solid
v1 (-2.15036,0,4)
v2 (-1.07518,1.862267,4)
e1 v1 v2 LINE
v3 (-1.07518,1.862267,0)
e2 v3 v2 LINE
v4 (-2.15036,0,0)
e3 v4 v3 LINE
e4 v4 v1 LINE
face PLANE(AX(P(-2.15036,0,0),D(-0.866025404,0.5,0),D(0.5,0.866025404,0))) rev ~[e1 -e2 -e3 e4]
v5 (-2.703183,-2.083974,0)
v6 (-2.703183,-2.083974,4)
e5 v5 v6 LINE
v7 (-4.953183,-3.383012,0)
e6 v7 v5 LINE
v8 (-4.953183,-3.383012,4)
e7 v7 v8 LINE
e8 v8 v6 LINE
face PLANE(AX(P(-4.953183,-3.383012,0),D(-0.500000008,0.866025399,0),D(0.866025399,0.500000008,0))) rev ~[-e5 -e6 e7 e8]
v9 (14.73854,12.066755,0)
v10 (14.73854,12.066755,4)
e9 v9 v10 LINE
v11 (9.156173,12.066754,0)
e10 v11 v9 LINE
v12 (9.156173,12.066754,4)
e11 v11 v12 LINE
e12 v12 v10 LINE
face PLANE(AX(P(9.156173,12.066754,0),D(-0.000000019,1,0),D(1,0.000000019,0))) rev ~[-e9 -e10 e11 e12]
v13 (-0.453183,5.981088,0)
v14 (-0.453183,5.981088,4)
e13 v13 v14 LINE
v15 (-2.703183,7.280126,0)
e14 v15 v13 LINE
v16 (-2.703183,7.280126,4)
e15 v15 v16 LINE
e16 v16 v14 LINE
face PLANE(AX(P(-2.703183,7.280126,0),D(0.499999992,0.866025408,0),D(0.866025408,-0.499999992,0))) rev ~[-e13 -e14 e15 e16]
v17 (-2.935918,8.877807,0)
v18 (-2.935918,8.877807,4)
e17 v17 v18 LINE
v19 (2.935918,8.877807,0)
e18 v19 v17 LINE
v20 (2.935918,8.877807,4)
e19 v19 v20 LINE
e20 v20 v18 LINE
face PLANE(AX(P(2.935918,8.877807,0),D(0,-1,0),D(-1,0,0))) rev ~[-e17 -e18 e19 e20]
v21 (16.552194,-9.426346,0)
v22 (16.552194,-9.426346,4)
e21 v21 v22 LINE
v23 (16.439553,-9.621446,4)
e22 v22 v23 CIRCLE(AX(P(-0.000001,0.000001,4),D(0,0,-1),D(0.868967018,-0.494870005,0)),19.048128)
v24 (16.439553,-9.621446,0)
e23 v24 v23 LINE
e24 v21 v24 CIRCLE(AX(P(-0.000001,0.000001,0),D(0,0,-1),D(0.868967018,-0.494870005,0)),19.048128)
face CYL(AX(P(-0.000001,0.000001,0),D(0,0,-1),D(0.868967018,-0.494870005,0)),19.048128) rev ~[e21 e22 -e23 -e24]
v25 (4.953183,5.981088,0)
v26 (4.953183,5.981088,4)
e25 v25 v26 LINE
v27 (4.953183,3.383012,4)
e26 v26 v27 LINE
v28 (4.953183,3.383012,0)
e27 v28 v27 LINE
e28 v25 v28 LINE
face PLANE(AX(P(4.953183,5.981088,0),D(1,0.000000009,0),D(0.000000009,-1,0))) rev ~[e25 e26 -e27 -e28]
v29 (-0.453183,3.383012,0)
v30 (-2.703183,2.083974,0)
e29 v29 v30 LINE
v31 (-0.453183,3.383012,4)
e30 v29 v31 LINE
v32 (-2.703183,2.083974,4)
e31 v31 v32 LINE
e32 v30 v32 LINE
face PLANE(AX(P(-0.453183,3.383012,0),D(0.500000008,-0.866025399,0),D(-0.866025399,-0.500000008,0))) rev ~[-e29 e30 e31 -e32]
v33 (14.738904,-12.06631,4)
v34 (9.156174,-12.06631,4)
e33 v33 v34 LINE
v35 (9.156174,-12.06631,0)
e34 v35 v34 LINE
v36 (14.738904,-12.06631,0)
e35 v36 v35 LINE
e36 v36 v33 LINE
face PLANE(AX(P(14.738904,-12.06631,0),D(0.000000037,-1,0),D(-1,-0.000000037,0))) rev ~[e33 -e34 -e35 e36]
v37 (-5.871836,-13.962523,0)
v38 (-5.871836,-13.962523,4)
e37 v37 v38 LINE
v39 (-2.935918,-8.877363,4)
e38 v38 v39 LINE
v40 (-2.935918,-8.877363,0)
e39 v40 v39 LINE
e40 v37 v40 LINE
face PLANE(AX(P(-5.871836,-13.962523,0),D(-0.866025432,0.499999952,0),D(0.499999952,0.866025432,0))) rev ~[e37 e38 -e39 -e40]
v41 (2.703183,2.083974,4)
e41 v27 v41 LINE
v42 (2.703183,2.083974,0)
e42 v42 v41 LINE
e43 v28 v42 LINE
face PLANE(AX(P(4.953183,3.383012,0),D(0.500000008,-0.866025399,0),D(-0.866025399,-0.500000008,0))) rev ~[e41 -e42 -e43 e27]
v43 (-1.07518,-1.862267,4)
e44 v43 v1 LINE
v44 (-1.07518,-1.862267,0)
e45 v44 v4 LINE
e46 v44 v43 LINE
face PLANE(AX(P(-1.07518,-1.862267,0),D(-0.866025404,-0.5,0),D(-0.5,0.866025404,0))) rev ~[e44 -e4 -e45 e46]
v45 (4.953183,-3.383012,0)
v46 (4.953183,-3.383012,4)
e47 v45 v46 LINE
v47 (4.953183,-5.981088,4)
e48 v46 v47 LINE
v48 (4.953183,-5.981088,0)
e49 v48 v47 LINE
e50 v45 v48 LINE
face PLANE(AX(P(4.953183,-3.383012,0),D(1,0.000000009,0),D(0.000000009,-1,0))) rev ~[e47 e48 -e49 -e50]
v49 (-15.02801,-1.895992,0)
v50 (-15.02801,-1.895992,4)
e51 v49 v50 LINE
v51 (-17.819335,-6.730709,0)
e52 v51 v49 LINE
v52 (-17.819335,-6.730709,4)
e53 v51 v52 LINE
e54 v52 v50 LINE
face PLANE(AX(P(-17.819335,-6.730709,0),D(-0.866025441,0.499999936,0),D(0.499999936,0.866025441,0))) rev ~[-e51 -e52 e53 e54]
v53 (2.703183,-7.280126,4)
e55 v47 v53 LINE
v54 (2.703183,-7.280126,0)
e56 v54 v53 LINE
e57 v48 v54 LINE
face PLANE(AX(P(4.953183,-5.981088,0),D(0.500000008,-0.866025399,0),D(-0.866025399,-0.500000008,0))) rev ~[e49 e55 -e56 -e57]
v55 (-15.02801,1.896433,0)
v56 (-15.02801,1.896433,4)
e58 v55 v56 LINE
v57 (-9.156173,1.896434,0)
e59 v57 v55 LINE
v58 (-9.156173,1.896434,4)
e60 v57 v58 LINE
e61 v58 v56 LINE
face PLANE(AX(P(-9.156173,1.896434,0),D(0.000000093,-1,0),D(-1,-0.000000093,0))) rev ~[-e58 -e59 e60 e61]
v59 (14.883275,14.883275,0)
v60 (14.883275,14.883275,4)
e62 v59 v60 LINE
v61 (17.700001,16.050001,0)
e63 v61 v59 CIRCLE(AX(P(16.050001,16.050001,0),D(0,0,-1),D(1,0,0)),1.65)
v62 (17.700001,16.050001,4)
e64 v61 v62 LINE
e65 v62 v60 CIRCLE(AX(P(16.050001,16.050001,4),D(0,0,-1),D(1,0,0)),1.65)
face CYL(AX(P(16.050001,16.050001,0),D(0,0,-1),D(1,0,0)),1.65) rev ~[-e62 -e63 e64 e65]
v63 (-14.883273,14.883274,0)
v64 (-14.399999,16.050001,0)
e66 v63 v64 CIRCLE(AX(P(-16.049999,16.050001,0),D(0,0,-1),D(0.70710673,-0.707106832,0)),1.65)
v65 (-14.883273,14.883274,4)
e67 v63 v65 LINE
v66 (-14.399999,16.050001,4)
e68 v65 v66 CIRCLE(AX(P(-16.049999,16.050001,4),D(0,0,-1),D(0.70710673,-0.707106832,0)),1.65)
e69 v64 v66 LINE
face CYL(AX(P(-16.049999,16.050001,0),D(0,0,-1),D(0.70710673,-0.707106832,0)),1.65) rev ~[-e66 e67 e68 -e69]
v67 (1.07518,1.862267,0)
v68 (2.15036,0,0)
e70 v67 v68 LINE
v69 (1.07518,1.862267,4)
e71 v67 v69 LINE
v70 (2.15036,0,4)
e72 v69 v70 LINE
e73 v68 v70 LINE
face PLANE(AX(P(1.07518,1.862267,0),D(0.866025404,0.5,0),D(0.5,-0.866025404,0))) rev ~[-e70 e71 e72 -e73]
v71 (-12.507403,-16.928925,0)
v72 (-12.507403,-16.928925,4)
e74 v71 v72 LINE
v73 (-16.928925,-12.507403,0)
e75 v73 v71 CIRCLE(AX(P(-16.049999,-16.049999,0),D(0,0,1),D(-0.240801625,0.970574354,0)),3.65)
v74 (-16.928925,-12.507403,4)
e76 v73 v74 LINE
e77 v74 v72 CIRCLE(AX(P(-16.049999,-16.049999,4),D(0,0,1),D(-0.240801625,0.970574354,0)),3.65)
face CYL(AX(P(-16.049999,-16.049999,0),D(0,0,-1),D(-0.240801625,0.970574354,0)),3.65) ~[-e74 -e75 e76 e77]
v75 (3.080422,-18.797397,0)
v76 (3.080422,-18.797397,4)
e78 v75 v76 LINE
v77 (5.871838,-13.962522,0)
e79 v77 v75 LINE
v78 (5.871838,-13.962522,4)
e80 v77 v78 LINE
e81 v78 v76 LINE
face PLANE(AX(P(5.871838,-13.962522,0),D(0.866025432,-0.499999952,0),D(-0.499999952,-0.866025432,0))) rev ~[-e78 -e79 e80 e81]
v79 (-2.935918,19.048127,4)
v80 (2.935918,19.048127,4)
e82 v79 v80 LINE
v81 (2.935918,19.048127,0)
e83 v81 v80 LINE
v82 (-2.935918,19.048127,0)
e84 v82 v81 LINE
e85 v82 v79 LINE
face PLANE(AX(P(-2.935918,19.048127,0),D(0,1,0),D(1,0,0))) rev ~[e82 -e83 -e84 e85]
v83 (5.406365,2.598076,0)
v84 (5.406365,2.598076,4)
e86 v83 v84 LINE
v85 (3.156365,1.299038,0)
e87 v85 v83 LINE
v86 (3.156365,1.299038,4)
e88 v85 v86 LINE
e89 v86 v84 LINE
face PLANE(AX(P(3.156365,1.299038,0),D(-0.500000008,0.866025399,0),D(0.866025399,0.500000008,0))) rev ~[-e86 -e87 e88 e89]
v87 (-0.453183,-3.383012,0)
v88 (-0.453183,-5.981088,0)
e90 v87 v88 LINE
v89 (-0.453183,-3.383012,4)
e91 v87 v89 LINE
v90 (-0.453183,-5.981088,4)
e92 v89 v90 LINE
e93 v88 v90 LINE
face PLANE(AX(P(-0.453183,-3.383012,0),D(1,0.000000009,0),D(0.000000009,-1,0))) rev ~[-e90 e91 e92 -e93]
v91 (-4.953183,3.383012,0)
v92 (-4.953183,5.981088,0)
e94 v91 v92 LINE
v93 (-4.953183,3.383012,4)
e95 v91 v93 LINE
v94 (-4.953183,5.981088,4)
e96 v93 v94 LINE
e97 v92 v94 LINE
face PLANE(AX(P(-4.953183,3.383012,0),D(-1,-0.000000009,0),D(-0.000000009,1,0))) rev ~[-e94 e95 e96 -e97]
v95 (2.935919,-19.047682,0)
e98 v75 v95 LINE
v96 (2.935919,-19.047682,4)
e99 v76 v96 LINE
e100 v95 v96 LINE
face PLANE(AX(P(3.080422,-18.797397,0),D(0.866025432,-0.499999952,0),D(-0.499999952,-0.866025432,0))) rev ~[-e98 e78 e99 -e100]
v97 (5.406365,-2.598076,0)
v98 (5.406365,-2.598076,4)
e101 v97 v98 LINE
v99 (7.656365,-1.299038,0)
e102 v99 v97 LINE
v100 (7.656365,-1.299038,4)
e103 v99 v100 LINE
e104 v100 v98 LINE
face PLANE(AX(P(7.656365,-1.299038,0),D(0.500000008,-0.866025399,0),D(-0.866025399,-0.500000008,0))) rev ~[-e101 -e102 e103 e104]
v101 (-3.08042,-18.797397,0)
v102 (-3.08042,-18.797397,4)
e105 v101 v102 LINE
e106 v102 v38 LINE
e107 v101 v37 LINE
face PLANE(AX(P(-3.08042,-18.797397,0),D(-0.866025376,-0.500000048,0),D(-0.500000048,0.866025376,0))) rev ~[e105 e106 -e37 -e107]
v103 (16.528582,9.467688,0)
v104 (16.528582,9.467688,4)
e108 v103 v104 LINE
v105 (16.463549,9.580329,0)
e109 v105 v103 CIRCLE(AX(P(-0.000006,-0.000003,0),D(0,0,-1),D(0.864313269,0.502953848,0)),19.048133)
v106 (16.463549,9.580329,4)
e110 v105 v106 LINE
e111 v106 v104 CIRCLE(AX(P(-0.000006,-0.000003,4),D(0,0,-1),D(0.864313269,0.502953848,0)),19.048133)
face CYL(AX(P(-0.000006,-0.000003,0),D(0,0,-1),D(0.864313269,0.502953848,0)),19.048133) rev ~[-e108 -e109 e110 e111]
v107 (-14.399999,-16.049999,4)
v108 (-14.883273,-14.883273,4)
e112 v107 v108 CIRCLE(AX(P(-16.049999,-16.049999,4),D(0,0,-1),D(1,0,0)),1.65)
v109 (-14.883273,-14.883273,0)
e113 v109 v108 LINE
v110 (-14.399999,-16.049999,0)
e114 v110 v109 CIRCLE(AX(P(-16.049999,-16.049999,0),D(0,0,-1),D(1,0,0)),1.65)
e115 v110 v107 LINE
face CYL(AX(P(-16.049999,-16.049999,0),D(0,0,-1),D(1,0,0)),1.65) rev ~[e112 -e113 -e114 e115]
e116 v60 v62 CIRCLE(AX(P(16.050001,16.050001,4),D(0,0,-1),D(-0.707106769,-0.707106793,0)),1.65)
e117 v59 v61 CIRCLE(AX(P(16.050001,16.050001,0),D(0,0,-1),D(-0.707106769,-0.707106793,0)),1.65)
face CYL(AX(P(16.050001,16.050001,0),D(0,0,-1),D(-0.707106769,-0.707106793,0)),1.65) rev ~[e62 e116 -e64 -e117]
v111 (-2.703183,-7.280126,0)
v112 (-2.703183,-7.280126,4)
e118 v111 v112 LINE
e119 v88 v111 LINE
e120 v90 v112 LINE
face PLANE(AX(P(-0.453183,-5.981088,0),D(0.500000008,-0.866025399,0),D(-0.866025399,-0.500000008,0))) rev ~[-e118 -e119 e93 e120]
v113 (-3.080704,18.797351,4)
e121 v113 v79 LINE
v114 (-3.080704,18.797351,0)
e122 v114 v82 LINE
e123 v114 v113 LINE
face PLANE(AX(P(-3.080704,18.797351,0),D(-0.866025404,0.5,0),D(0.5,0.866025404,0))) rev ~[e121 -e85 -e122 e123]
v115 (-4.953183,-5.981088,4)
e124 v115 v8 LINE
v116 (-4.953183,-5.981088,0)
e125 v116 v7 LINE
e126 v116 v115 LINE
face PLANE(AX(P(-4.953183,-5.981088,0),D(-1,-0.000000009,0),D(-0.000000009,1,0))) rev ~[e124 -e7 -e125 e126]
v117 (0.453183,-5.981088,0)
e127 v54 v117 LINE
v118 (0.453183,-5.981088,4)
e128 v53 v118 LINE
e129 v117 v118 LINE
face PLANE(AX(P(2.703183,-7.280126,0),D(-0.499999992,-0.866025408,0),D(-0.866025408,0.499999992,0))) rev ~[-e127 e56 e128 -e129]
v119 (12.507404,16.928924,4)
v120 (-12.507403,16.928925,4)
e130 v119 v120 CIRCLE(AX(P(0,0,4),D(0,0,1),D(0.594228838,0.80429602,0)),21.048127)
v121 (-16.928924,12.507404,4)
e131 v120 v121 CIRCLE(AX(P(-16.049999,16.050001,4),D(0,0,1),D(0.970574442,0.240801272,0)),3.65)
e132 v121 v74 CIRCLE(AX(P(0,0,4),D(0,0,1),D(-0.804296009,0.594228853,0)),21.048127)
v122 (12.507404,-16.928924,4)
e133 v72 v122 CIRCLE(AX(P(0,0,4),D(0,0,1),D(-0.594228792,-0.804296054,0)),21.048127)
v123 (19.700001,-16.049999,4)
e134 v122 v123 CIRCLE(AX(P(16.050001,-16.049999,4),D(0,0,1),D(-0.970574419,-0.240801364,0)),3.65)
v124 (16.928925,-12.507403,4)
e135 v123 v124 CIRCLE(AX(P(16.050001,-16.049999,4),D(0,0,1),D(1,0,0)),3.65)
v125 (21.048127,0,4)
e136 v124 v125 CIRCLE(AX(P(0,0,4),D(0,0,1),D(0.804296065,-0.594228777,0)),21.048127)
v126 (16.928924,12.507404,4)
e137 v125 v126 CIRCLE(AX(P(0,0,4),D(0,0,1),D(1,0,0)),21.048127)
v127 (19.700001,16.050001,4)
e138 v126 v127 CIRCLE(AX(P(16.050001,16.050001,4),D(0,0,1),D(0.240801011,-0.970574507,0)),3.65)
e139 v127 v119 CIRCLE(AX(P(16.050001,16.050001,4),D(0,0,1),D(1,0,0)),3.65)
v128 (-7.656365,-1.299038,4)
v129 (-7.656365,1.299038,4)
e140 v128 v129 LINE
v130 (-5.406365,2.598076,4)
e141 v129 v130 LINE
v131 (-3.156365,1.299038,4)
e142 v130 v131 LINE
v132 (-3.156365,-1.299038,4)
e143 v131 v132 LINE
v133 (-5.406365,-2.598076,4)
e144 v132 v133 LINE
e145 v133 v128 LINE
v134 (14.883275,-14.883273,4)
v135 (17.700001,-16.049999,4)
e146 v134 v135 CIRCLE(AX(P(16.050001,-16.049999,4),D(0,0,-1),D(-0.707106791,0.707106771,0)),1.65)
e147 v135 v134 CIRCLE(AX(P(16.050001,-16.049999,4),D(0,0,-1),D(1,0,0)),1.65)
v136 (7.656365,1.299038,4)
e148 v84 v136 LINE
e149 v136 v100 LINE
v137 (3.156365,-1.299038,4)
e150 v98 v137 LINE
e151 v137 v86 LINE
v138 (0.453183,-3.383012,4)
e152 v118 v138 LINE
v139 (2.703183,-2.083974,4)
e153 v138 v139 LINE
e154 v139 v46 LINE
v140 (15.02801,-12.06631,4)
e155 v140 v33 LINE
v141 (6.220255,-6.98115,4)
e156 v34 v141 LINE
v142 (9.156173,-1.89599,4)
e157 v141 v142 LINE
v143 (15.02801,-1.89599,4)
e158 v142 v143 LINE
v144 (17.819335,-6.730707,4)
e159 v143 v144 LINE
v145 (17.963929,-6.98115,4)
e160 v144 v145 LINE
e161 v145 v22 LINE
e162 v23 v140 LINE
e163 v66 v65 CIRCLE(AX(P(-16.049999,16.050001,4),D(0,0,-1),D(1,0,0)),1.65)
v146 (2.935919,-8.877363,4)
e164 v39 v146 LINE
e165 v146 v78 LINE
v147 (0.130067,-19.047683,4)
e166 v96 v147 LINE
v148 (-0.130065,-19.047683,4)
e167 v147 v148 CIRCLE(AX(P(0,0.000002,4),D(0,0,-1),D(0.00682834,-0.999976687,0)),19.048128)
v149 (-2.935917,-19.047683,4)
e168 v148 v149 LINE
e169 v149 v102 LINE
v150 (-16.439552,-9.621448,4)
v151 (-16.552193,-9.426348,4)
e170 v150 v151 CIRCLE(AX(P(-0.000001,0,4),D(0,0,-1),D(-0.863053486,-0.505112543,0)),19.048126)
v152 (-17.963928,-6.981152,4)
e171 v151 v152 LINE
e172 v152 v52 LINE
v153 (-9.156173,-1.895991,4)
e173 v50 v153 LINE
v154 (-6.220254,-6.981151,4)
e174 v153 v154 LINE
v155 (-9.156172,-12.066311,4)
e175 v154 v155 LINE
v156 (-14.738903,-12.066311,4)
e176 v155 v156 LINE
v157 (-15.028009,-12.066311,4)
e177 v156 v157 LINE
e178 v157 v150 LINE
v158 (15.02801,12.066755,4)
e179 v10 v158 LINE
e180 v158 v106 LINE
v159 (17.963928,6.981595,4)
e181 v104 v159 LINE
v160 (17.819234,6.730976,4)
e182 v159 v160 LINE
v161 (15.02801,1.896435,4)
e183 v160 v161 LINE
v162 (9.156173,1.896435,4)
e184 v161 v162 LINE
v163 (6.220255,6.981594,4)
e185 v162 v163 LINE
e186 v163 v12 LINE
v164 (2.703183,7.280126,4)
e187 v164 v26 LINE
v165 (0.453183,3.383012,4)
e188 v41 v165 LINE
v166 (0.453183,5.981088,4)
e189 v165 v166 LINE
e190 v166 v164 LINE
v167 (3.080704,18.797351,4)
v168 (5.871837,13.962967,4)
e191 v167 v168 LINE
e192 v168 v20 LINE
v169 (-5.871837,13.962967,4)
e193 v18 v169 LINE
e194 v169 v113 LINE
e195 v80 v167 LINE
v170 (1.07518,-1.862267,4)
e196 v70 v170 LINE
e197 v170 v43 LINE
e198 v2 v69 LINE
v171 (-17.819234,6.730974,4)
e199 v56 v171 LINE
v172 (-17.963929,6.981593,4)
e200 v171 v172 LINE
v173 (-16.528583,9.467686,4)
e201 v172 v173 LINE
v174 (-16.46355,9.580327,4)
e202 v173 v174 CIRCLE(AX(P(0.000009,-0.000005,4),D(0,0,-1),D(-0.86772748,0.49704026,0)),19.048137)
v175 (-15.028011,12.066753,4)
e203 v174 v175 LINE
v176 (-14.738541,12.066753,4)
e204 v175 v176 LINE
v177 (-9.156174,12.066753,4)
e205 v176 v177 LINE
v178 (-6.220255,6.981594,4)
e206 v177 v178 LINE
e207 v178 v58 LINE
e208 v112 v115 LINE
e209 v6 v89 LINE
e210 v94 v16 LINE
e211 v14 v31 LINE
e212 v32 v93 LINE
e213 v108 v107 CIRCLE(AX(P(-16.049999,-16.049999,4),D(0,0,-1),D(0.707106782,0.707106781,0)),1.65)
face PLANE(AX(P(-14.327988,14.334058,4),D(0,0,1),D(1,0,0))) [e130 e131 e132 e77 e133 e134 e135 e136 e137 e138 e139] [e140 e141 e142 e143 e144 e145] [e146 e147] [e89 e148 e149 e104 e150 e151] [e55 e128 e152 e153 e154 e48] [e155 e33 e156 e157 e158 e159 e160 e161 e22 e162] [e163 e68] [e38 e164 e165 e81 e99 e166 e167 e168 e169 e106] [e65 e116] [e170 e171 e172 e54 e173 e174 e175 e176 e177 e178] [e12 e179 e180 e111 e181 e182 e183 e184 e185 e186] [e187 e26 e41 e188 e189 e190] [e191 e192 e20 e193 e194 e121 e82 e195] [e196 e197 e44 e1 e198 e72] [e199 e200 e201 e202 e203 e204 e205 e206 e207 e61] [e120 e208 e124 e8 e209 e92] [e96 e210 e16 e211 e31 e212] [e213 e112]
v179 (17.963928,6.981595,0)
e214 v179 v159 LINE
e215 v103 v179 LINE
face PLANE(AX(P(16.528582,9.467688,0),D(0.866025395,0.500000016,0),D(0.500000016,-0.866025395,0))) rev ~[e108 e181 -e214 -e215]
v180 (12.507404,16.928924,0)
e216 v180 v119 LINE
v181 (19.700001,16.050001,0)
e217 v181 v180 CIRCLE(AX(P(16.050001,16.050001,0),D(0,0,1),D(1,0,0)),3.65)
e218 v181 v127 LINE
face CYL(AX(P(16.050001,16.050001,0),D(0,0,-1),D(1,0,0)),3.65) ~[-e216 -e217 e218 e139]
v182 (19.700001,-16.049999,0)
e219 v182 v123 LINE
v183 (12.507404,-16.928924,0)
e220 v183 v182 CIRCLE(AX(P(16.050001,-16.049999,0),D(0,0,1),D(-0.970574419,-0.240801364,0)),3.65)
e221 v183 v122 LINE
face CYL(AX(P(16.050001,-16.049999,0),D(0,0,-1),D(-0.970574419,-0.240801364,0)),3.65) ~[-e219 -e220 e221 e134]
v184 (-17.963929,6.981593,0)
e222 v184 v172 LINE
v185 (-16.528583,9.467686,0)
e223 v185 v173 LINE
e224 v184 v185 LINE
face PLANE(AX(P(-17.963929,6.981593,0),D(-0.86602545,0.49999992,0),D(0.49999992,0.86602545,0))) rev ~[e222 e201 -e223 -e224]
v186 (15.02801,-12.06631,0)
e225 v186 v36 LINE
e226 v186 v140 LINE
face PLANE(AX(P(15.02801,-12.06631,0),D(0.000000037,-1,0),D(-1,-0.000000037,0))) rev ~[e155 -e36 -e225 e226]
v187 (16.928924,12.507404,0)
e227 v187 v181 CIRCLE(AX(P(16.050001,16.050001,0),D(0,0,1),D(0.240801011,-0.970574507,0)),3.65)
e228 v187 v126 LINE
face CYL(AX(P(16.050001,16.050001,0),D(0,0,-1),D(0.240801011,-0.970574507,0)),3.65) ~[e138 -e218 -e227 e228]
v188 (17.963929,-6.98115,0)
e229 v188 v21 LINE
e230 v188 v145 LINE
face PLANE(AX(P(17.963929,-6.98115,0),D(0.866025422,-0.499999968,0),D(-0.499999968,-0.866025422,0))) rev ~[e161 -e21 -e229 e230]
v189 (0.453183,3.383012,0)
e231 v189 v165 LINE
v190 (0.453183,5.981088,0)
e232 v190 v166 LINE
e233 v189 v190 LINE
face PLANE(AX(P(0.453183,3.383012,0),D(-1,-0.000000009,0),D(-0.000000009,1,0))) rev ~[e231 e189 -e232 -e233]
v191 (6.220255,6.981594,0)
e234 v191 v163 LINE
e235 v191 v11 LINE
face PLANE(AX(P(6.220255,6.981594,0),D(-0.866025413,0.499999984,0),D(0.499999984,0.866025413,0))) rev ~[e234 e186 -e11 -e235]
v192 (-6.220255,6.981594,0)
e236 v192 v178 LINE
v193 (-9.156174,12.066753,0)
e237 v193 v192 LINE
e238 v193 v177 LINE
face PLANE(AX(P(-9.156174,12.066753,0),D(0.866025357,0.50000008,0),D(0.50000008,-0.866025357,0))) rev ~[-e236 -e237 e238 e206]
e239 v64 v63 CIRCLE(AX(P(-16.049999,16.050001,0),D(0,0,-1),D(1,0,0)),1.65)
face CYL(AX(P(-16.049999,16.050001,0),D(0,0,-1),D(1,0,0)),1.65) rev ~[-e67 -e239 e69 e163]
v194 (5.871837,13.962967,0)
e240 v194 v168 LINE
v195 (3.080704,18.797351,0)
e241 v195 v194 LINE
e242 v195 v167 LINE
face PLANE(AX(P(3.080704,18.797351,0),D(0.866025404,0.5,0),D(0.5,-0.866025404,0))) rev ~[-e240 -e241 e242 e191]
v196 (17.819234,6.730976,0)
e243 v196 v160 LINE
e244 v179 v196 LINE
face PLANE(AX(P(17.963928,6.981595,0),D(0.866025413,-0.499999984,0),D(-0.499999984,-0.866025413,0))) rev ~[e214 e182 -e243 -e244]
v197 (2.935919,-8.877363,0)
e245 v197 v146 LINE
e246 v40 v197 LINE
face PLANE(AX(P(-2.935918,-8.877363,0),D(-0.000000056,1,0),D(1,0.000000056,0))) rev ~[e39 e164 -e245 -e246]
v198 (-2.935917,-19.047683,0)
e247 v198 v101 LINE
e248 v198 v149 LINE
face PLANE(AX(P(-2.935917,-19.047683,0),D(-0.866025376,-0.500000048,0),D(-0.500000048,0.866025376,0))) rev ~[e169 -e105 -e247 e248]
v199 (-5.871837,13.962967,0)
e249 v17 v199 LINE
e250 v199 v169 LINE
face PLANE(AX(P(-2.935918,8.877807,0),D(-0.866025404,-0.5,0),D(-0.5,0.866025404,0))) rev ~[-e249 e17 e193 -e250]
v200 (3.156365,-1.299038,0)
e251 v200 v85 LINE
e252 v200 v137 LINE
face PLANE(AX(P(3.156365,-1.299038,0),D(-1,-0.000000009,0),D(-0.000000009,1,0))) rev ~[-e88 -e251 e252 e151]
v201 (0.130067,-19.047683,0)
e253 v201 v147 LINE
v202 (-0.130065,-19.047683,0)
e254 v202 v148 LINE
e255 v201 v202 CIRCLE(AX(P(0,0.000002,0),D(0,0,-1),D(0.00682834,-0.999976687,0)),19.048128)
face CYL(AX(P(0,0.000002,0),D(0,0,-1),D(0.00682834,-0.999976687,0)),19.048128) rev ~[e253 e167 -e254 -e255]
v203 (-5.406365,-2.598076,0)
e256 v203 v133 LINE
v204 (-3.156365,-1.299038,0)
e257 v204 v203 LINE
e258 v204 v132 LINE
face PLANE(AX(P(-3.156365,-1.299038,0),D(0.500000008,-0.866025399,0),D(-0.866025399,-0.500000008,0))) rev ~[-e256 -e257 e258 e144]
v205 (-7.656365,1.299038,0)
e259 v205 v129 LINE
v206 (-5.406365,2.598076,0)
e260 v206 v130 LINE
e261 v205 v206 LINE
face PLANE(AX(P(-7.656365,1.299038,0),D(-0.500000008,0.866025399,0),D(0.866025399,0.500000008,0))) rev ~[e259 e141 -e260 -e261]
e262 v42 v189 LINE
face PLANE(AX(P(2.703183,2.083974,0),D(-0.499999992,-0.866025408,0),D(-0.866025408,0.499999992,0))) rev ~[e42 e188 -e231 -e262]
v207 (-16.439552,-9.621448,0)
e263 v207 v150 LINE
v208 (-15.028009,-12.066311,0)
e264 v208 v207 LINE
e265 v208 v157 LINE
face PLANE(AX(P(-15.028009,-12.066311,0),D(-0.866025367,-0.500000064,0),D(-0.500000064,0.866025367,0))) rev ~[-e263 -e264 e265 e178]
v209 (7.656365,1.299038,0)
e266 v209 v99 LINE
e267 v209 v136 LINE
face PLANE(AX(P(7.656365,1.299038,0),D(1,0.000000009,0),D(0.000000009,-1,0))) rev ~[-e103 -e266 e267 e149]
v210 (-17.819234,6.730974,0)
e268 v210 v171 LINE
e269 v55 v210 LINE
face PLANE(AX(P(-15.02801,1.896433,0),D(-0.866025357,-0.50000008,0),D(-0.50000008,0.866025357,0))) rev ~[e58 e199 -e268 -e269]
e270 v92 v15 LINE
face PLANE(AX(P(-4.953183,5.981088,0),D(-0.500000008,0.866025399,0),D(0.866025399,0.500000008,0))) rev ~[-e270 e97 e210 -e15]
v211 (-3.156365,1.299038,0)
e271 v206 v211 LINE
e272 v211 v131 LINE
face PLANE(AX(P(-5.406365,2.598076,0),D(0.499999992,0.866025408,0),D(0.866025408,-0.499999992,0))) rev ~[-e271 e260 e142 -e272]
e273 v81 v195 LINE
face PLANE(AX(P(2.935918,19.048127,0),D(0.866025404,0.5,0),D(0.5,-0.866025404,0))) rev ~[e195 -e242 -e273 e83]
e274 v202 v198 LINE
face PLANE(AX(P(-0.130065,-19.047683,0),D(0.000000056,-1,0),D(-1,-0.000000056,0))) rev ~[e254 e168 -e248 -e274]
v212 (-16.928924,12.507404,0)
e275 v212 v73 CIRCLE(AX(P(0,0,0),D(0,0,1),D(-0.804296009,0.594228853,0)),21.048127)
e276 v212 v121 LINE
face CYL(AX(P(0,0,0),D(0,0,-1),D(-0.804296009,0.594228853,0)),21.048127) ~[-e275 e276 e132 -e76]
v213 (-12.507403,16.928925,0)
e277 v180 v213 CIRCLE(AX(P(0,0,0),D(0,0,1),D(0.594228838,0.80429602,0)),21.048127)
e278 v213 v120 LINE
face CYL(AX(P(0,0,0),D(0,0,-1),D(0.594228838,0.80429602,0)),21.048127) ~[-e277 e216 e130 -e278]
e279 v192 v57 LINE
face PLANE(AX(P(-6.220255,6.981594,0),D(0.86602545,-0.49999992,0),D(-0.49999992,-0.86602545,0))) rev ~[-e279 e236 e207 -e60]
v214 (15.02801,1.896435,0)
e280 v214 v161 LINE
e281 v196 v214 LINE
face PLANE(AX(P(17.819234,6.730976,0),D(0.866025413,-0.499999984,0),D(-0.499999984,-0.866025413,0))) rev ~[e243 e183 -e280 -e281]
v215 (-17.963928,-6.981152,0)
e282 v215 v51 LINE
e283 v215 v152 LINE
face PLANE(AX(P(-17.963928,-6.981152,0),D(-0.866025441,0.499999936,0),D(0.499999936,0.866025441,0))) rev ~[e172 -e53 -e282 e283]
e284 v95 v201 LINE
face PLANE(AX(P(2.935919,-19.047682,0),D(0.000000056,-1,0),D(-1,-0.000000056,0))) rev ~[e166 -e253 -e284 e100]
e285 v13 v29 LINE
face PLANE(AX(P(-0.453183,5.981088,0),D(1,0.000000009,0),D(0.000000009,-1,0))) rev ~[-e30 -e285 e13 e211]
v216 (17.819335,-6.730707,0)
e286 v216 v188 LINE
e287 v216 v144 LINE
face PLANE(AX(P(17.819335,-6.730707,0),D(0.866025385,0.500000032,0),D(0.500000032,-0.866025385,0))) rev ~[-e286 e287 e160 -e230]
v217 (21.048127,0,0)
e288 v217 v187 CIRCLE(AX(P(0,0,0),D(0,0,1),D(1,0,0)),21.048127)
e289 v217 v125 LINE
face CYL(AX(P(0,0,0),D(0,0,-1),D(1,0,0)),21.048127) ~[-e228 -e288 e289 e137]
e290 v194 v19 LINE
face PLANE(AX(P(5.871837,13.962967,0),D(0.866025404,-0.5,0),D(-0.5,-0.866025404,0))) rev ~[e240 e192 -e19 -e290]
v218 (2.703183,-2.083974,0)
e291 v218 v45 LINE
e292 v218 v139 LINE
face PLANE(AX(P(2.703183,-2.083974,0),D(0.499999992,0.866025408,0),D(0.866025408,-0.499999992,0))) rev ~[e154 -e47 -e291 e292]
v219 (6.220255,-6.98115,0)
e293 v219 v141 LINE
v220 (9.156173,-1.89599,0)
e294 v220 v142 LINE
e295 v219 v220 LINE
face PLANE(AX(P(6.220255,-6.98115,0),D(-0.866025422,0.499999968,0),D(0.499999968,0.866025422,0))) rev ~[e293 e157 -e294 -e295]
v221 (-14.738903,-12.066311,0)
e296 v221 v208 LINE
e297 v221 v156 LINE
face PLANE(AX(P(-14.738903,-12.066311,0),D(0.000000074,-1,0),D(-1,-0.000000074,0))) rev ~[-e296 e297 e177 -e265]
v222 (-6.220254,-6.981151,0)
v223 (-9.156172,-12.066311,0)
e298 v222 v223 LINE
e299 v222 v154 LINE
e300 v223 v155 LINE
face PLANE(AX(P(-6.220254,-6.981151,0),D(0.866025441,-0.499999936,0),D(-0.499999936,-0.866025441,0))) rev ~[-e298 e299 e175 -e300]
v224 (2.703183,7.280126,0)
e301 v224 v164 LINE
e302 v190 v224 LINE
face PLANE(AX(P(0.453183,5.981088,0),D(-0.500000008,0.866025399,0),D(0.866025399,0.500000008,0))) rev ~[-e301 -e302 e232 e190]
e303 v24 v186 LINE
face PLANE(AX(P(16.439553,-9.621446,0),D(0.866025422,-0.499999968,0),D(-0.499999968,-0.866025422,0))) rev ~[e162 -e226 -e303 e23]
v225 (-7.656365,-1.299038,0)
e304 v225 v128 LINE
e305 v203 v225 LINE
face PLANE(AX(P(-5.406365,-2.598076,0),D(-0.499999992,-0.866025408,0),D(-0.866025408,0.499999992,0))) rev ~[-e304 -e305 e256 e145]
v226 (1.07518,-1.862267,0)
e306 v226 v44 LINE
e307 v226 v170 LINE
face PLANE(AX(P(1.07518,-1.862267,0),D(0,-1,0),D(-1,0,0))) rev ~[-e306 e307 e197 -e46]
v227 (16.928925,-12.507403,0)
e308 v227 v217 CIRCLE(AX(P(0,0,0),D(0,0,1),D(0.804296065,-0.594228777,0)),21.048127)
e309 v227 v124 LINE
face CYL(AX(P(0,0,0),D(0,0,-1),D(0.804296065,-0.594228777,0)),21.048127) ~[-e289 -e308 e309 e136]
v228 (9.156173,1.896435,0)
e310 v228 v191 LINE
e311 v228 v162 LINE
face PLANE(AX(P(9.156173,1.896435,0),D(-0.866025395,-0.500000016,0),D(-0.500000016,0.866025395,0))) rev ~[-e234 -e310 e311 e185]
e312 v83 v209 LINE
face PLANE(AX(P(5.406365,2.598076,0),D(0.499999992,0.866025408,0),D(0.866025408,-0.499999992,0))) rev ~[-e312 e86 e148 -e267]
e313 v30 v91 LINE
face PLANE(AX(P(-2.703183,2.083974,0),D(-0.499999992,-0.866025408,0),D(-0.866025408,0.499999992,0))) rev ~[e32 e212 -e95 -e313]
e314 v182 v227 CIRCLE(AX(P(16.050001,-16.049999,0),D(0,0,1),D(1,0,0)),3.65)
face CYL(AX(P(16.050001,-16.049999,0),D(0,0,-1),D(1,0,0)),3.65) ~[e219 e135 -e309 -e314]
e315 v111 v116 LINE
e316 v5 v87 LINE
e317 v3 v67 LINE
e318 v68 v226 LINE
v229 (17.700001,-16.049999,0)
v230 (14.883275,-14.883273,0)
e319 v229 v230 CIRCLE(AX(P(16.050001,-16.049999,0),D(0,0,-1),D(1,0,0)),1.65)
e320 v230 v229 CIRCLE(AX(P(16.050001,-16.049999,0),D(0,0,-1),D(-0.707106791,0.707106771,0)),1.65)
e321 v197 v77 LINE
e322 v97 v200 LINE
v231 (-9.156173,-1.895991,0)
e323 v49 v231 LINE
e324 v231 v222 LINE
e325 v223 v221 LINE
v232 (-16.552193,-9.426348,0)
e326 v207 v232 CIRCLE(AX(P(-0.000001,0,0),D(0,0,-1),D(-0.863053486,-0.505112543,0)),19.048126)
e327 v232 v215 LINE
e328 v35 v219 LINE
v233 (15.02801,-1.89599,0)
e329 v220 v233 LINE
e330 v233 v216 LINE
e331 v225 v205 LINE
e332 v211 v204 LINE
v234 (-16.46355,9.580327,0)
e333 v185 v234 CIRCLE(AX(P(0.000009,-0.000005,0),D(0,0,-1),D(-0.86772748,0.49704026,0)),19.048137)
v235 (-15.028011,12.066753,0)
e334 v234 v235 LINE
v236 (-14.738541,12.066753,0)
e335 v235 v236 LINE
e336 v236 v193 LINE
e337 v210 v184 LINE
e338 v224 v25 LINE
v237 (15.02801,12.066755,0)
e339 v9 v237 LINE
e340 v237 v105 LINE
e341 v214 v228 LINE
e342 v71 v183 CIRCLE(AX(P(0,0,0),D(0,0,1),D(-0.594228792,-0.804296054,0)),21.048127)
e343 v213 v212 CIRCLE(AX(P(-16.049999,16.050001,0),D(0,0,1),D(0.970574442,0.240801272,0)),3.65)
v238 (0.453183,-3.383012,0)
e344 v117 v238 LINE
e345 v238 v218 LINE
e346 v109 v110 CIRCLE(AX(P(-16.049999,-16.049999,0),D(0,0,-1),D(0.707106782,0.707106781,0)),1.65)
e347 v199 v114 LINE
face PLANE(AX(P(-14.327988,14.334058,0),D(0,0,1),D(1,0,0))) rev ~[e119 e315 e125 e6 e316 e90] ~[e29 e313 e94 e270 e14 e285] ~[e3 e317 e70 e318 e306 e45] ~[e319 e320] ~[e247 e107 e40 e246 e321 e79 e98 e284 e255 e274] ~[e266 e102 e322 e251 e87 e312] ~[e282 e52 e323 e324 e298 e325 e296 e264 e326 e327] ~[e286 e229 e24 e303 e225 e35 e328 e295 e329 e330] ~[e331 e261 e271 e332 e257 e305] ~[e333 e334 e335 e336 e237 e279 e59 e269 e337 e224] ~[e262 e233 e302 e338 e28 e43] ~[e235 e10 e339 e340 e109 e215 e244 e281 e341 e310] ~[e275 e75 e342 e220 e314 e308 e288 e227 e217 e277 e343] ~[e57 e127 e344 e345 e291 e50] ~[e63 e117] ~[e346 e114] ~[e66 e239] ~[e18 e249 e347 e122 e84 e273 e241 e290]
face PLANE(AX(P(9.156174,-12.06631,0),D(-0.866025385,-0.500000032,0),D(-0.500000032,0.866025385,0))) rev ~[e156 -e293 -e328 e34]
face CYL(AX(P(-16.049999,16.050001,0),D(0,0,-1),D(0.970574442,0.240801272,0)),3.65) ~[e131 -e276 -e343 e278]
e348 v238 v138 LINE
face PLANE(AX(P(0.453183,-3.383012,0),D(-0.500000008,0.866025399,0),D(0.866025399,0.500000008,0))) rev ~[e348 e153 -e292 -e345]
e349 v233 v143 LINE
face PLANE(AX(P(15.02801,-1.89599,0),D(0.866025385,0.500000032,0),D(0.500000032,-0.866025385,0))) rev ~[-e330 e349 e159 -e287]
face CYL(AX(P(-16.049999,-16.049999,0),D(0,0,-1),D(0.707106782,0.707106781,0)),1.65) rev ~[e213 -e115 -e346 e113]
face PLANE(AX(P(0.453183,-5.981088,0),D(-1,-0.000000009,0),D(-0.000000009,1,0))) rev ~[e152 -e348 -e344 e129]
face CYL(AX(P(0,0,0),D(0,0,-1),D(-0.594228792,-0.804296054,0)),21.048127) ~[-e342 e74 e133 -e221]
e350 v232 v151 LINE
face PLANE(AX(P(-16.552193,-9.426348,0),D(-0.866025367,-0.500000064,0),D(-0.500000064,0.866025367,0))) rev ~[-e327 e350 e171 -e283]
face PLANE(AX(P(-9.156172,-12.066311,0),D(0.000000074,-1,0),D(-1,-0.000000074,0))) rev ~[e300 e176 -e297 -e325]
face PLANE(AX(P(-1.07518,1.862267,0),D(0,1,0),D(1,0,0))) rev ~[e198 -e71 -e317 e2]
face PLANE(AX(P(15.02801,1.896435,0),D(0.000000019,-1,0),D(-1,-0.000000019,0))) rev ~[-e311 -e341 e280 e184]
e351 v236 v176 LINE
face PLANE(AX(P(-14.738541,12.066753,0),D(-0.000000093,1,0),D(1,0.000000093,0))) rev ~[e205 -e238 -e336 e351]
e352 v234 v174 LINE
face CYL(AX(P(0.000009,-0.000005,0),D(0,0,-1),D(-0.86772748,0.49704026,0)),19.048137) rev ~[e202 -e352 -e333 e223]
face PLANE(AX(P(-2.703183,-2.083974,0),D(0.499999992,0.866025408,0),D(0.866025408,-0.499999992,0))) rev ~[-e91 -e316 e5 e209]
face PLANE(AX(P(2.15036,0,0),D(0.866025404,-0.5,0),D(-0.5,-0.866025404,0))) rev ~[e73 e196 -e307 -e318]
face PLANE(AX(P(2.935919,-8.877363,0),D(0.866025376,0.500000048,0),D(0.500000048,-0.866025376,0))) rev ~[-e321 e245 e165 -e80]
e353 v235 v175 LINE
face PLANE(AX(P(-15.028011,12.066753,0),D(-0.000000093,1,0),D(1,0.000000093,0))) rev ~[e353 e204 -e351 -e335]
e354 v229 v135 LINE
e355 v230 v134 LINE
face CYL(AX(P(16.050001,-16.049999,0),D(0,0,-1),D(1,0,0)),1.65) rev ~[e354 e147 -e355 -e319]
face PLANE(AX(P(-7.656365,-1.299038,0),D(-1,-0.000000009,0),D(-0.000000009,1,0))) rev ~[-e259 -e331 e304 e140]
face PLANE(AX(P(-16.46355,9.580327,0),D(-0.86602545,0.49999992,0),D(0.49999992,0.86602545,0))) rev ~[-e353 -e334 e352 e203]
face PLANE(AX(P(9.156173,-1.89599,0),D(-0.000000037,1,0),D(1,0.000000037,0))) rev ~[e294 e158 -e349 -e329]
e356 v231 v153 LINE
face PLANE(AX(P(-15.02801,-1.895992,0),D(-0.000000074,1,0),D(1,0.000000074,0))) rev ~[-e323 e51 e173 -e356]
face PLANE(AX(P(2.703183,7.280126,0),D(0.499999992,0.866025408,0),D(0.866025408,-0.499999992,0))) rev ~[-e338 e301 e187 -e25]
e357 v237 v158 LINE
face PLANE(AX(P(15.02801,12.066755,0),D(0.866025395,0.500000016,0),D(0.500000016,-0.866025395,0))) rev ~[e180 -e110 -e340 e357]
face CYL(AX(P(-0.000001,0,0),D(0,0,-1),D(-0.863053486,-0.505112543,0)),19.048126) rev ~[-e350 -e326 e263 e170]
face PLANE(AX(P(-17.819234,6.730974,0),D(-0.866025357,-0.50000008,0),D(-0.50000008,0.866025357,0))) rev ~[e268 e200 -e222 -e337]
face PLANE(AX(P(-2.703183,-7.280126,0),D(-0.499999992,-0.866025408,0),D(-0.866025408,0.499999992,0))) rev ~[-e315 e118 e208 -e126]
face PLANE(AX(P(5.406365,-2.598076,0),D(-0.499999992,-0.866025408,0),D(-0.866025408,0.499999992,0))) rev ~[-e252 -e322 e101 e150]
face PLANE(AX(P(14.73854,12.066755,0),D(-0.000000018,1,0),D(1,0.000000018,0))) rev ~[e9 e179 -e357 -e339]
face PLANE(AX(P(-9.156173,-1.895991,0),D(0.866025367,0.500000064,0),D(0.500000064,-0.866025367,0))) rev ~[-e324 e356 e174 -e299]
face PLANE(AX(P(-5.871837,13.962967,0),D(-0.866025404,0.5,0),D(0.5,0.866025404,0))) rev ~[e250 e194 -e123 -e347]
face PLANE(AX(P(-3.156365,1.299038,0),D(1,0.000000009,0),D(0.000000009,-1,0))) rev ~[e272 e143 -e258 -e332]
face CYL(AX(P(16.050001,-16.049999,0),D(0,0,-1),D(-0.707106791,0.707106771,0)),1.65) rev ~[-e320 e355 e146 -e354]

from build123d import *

# Parameters (mm, degrees)
F1_DEPTH = 4


# Not quite as in the source:
# - ends of sketch curves that miss each other by under 0.0002 mm in the source are joined


with BuildPart() as f1:
    # F0 (on Top) → F1 (new body)
    with BuildSketch(Plane.XY):
        with BuildLine():
            ThreePointArc((-14.8832723697, 14.8832737265), (-15.9503966088, 13.7334803044), (-16.9289242157, 12.5074041331))
            ThreePointArc((-16.9289242157, 12.5074041331), (-15.0725488028, 12.533313309), (-13.4690596421, 13.4690608552))
            ThreePointArc((-13.4690596421, 13.4690608552), (-12.6778389857, 14.6532061326), (-12.3999992371, 16.0500007629))
            ThreePointArc((-12.3999992371, 16.0500007629), (-12.4269495545, 16.4927320562), (-12.5074025236, 16.9289254048))
            ThreePointArc((-12.5074025236, 16.9289254048), (-13.7334788191, 15.9503978876), (-14.8832723697, 14.8832737265))
        make_face()
        with BuildLine():
            ThreePointArc((12.5074038131, 16.9289244521), (8.016e-07, 21.0481265971), (-12.5074025236, 16.9289254048))
            ThreePointArc((-12.5074025236, 16.9289254048), (-12.4269495545, 16.4927320562), (-12.3999992371, 16.0500007629))
            ThreePointArc((-12.3999992371, 16.0500007629), (-12.6778389857, 14.6532061326), (-13.4690596421, 13.4690608552))
            ThreePointArc((-13.4690596421, 13.4690608552), (-8.6931773802, 16.9487401861), (-3.0807040231, 18.7973506001))
            Line((-3.0807040231, 18.7973506001), (-2.9359184337, 19.0481265971))
            Line((-2.9359184337, 19.0481265971), (3.1e-08, 19.0481265971))
            Line((3.1e-08, 19.0481265971), (2.9359184337, 19.0481265971))
            Line((2.9359184337, 19.0481265971), (3.0807040231, 18.7973506001))
            ThreePointArc((3.0807040231, 18.7973506001), (8.6931777594, 16.9487399916), (13.4690594818, 13.4690594896))
            ThreePointArc((13.4690594818, 13.4690594896), (12.5333135158, 15.0725495848), (12.5074038131, 16.9289244521))
        make_face()
        with BuildLine():
            ThreePointArc((14.8832730679, 14.8832730283), (13.7334798008, 15.9503970424), (12.5074038131, 16.9289244521))
            ThreePointArc((12.5074038131, 16.9289244521), (12.5333135158, 15.0725495848), (13.4690610077, 13.4690610155))
            ThreePointArc((13.4690610077, 13.4690610155), (15.0725495795, 12.5333135173), (16.9289244521, 12.5074038131))
            ThreePointArc((16.9289244521, 12.5074038131), (15.9503970607, 13.7334797795), (14.8832730679, 14.8832730283))
        make_face()
        with BuildLine():
            ThreePointArc((14.7389042455, -12.0663096472), (14.1214106882, -12.7834614653), (13.469060126, -13.4690588454))
            ThreePointArc((13.469060126, -13.4690588454), (15.0725499715, -12.5333118824), (16.9289254048, -12.5074025236))
            ThreePointArc((16.9289254048, -12.5074025236), (19.9918208065, -6.5841274356), (21.0481265971, 0))
            ThreePointArc((21.0481265971, 0), (19.9918205558, 6.584128197), (16.9289244521, 12.5074038131))
            ThreePointArc((16.9289244521, 12.5074038131), (15.0725495795, 12.5333135173), (13.4690610077, 13.4690610155))
            ThreePointArc((13.4690610077, 13.4690610155), (14.1212174462, 12.7836749293), (14.7385400167, 12.0667545362))
            Line((14.7385400167, 12.0667545362), (15.0280097995, 12.0667545415))
            Line((15.0280097995, 12.0667545415), (16.4635485578, 9.5803285823))
            ThreePointArc((16.4635485578, 9.5803285823), (16.496161351, 9.5240636044), (16.5285818567, 9.4676876093))
            Line((16.5285818567, 9.4676876093), (17.9639283275, 6.9815947019))
            Line((17.9639283275, 6.9815947019), (17.8192336321, 6.7309761272))
            ThreePointArc((17.8192336321, 6.7309761272), (18.7383850018, 3.4211188793), (19.0481265971, 0))
            ThreePointArc((19.0481265971, 0), (18.7384108655, -3.4209772138), (17.8193354047, -6.7307066936))
            Line((17.8193354047, -6.7307066936), (17.9639287158, -6.9811496335))
            Line((17.9639287158, -6.9811496335), (16.5521937692, -9.4263464974))
            ThreePointArc((16.5521937692, -9.4263464974), (16.4961618808, -9.5240626868), (16.4395531298, -9.6214458244))
            Line((16.4395531298, -9.6214458244), (15.0280104707, -12.0663096364))
            Line((15.0280104707, -12.0663096364), (14.7389042455, -12.0663096472))
        make_face()
        with BuildLine():
            ThreePointArc((13.469060889, -13.4690596084), (12.5333133154, -15.0725487798), (12.5074041331, -16.9289242157))
            ThreePointArc((12.5074041331, -16.9289242157), (13.7334803406, -15.9503965776), (14.8832737941, -14.8832723021))
            ThreePointArc((14.8832737941, -14.8832723021), (15.9503979188, -13.7334787829), (16.9289254048, -12.5074025236))
            ThreePointArc((16.9289254048, -12.5074025236), (15.0725499715, -12.5333118824), (13.469060889, -13.4690596084))
        make_face()
        with BuildLine():
            ThreePointArc((-12.3999992371, -16.0499992371), (-12.4269496351, -16.4927311897), (-12.5074028436, -16.9289251684))
            ThreePointArc((-12.5074028436, -16.9289251684), (8.016e-07, -21.0481265971), (12.5074041331, -16.9289242157))
            ThreePointArc((12.5074041331, -16.9289242157), (12.5333133154, -15.0725487798), (13.469060889, -13.4690596084))
            ThreePointArc((13.469060889, -13.4690596084), (8.693050972, -16.9488050215), (3.0804218918, -18.7973968365))
            Line((3.0804218918, -18.7973968365), (2.9359194933, -19.0476823647))
            Line((2.9359194933, -19.0476823647), (0.1300670867, -19.0476825208))
            ThreePointArc((0.1300670867, -19.0476825208), (1.0596e-06, -19.0481265971), (-0.1300649676, -19.0476825353))
            Line((-0.1300649676, -19.0476825353), (-2.9359173741, -19.0476826914))
            Line((-2.9359173741, -19.0476826914), (-3.0804198005, -18.7973971792))
            ThreePointArc((-3.0804198005, -18.7973971792), (-8.6930496263, -16.9488057118), (-13.4690594857, -13.4690594857))
            ThreePointArc((-13.4690594857, -13.4690594857), (-12.6778389434, -14.6532047089), (-12.3999992371, -16.0499992371))
        make_face()
        with BuildLine():
            ThreePointArc((-16.9289251684, -12.5074028436), (-15.9503974445, -13.7334793337), (-14.8832730474, -14.8832730488))
            ThreePointArc((-14.8832730474, -14.8832730488), (-13.733479333, -15.9503974452), (-12.5074028436, -16.9289251684))
            ThreePointArc((-12.5074028436, -16.9289251684), (-12.4269496351, -16.4927311897), (-12.3999992371, -16.0499992371))
            ThreePointArc((-12.3999992371, -16.0499992371), (-12.6778389434, -14.6532047089), (-13.4690594857, -13.4690594857))
            ThreePointArc((-13.4690594857, -13.4690594857), (-15.0725491692, -12.5333116813), (-16.9289251684, -12.5074028436))
        make_face()
        with BuildLine():
            ThreePointArc((-16.9289242157, 12.5074041331), (-21.0481265971, 8.016e-07), (-16.9289251684, -12.5074028436))
            ThreePointArc((-16.9289251684, -12.5074028436), (-15.0725491692, -12.5333116813), (-13.4690594857, -13.4690594857))
            ThreePointArc((-13.4690594857, -13.4690594857), (-14.1214096732, -12.7834625865), (-14.7389029031, -12.066311287))
            Line((-14.7389029031, -12.066311287), (-15.0280091282, -12.0663113084))
            Line((-15.0280091282, -12.0663113084), (-16.4395520575, -9.6214476566))
            ThreePointArc((-16.4395520575, -9.6214476566), (-16.4961608212, -9.5240645221), (-16.5521927222, -9.4263483357))
            Line((-16.5521927222, -9.4263483357), (-17.9639279391, -6.9811516321))
            Line((-17.9639279391, -6.9811516321), (-17.8193346558, -6.7307086762))
            ThreePointArc((-17.8193346558, -6.7307086762), (-19.0481265966, 0.0001418878), (-17.8192343809, 6.7309741447))
            Line((-17.8192343809, 6.7309741447), (-17.9639291042, 6.9815927033))
            Line((-17.9639291042, 6.9815927033), (-16.5285829132, 9.4676857649))
            ThreePointArc((-16.5285829132, 9.4676857649), (-16.4961624106, 9.5240617691), (-16.4635496205, 9.5803267561))
            Line((-16.4635496205, 9.5803267561), (-15.0280111419, 12.0667528696))
            Line((-15.0280111419, 12.0667528696), (-14.7385413592, 12.0667528964))
            ThreePointArc((-14.7385413592, 12.0667528964), (-14.1212178714, 12.7836744596), (-13.4690588792, 13.4690600923))
            ThreePointArc((-13.4690588792, 13.4690600923), (-15.0725488028, 12.533313309), (-16.9289242157, 12.5074041331))
        make_face()
        with BuildLine():
            ThreePointArc((-12.5074025236, 16.9289254048), (-18.6309388657, 18.630940637), (-16.9289242157, 12.5074041331))
            ThreePointArc((-16.9289242157, 12.5074041331), (-15.9503966088, 13.7334803044), (-14.8832723697, 14.8832737265))
            ThreePointArc((-14.8832723697, 14.8832737265), (-13.7334788191, 15.9503978876), (-12.5074025236, 16.9289254048))
        make_face()
        with BuildLine():
            ThreePointArc((-14.3999992371, 16.0500007629), (-14.5255980313, 15.4185730443), (-14.8832731326, 14.8832744894))
            ThreePointArc((-14.8832731326, 14.8832744894), (-17.5744004428, 16.6814284816), (-14.3999992371, 16.0500007629))
        make_face(mode=Mode.SUBTRACT)
        with BuildLine():
            ThreePointArc((19.7000007629, 16.0500007629), (16.492731569, 19.673050505), (12.5074038131, 16.9289244521))
            ThreePointArc((12.5074038131, 16.9289244521), (13.7334798008, 15.9503970424), (14.8832730679, 14.8832730283))
            ThreePointArc((14.8832730679, 14.8832730283), (15.9503970607, 13.7334797795), (16.9289244521, 12.5074038131))
            ThreePointArc((16.9289244521, 12.5074038131), (18.9249417593, 13.801175677), (19.7000007629, 16.0500007629))
        make_face()
        with BuildLine():
            ThreePointArc((17.7000007629, 16.0500007629), (16.6814284393, 14.5255995397), (14.8832745938, 14.8832745541))
            ThreePointArc((14.8832745938, 14.8832745541), (15.4185730866, 17.5744019862), (17.7000007629, 16.0500007629))
        make_face(mode=Mode.SUBTRACT)
        with BuildLine():
            ThreePointArc((14.8832737941, -14.8832723021), (13.7334803406, -15.9503965776), (12.5074041331, -16.9289242157))
            ThreePointArc((12.5074041331, -16.9289242157), (16.4927322284, -19.6730488985), (19.7000007629, -16.0499992371))
            ThreePointArc((19.7000007629, -16.0499992371), (18.9249420617, -13.8011745377), (16.9289254048, -12.5074025236))
            ThreePointArc((16.9289254048, -12.5074025236), (15.9503979188, -13.7334787829), (14.8832737941, -14.8832723021))
        make_face()
        with BuildLine():
            ThreePointArc((17.7000007629, -16.0499992371), (15.4185731106, -17.5744004703), (14.8832745571, -14.883273065))
            ThreePointArc((14.8832745571, -14.883273065), (16.6814284153, -14.5255980038), (17.7000007629, -16.0499992371))
        make_face(mode=Mode.SUBTRACT)
        with BuildLine():
            ThreePointArc((-12.5074028436, -16.9289251684), (-13.733479333, -15.9503974452), (-14.8832730474, -14.8832730488))
            ThreePointArc((-14.8832730474, -14.8832730488), (-15.9503974445, -13.7334793337), (-16.9289251684, -12.5074028436))
            ThreePointArc((-16.9289251684, -12.5074028436), (-18.6309389884, -18.6309389884), (-12.5074028436, -16.9289251684))
        make_face()
        with BuildLine():
            ThreePointArc((-14.8832730474, -14.8832730488), (-14.5255980082, -15.4185715741), (-14.3999992371, -16.0499992371))
            ThreePointArc((-14.3999992371, -16.0499992371), (-17.5744004659, -16.6814269), (-14.8832730474, -14.8832730488))
        make_face(mode=Mode.SUBTRACT)
        with BuildLine():
            ThreePointArc((-14.7389029031, -12.066311287), (-14.1214096732, -12.7834625865), (-13.4690594857, -13.4690594857))
            ThreePointArc((-13.4690594857, -13.4690594857), (-8.6930496263, -16.9488057118), (-3.0804198005, -18.7973971792))
            Line((-3.0804198005, -18.7973971792), (-5.8718360907, -13.9625229606))
            Line((-5.8718360907, -13.9625229606), (-2.9359179399, -8.8773629033))
            Line((-2.9359179399, -8.8773629033), (2.9359189275, -8.8773625766))
            Line((2.9359189275, -8.8773625766), (5.8718376441, -13.9625223073))
            Line((5.8718376441, -13.9625223073), (3.0804218918, -18.7973968365))
            ThreePointArc((3.0804218918, -18.7973968365), (8.693050972, -16.9488050215), (13.469060126, -13.4690588454))
            ThreePointArc((13.469060126, -13.4690588454), (14.1214106882, -12.7834614653), (14.7389042455, -12.0663096472))
            Line((14.7389042455, -12.0663096472), (9.1561736033, -12.0663098542))
            Line((9.1561736033, -12.0663098542), (6.220254981, -6.981150069))
            Line((6.220254981, -6.981150069), (9.1561732261, -1.8959900661))
            Line((9.1561732261, -1.8959900661), (15.0280100935, -1.8959898484))
            Line((15.0280100935, -1.8959898484), (17.8193354047, -6.7307066936))
            ThreePointArc((17.8193354047, -6.7307066936), (18.7384108655, -3.4209772138), (19.0481265971, 0))
            ThreePointArc((19.0481265971, 0), (18.7383850018, 3.4211188793), (17.8192336321, 6.7309761272))
            Line((17.8192336321, 6.7309761272), (15.028009988, 1.8964347534))
            Line((15.028009988, 1.8964347534), (9.1561731206, 1.8964346445))
            Line((9.1561731206, 1.8964346445), (6.2202545927, 6.9815944842))
            Line((6.2202545927, 6.9815944842), (9.1561729321, 12.0667544326))
            Line((9.1561729321, 12.0667544326), (14.7385400167, 12.0667545362))
            ThreePointArc((14.7385400167, 12.0667545362), (14.1212174462, 12.7836749293), (13.4690594818, 13.4690594896))
            ThreePointArc((13.4690594818, 13.4690594896), (8.6931777594, 16.9487399916), (3.0807040231, 18.7973506001))
            Line((3.0807040231, 18.7973506001), (5.8718368674, 13.9629667031))
            Line((5.8718368674, 13.9629667031), (2.9359184337, 8.877806809))
            Line((2.9359184337, 8.877806809), (-2.9359184337, 8.877806809))
            Line((-2.9359184337, 8.877806809), (-5.8718368674, 13.9629667031))
            Line((-5.8718368674, 13.9629667031), (-3.0807040231, 18.7973506001))
            ThreePointArc((-3.0807040231, 18.7973506001), (-8.6931773802, 16.9487401861), (-13.4690588792, 13.4690600923))
            ThreePointArc((-13.4690588792, 13.4690600923), (-14.1212178714, 12.7836744596), (-14.7385413592, 12.0667528964))
            Line((-14.7385413592, 12.0667528964), (-9.1561742745, 12.066753414))
            Line((-9.1561742745, 12.066753414), (-6.2202553694, 6.9815937921))
            Line((-6.2202553694, 6.9815937921), (-9.1561733316, 1.8964336259))
            Line((-9.1561733316, 1.8964336259), (-15.028010199, 1.8964330815))
            Line((-15.028010199, 1.8964330815), (-17.8192343809, 6.7309741447))
            ThreePointArc((-17.8192343809, 6.7309741447), (-19.0481265966, 0.0001418878), (-17.8193346558, -6.7307086762))
            Line((-17.8193346558, -6.7307086762), (-15.0280098826, -1.8959915203))
            Line((-15.0280098826, -1.8959915203), (-9.1561730152, -1.8959910848))
            Line((-9.1561730152, -1.8959910848), (-6.2202542043, -6.9811507611))
            Line((-6.2202542043, -6.9811507611), (-9.1561722608, -12.0663108729))
            Line((-9.1561722608, -12.0663108729), (-14.7389029031, -12.066311287))
        make_face()
        Polygon((-3.1563654489, -1.299038115), (-5.4063654369, -2.5980762415), (-7.6563654489, -1.2990381567), (-7.656365473, 1.2990380546), (-5.406365485, 2.5980761812), (-3.156365473, 1.2990380963), align=None, mode=Mode.SUBTRACT)
        Polygon((-0.4531827164, -3.3830117199), (-0.4531826923, -5.9810879312), (-2.7031826802, -7.2801260578), (-4.9531826923, -5.981087973), (-4.9531827164, -3.3830117616), (-2.7031827284, -2.0839736351), align=None, mode=Mode.SUBTRACT)
        Polygon((2.7031827325, -2.0839736049), (4.9531827446, -3.3830116897), (4.9531827687, -5.981087901), (2.7031827807, -7.2801260276), (0.4531827687, -5.9810879428), (0.4531827446, -3.3830117314), align=None, mode=Mode.SUBTRACT)
        Polygon((-2.7031827325, 2.0839736049), (-4.9531827446, 3.3830116897), (-4.9531827687, 5.981087901), (-2.7031827807, 7.2801260276), (-0.4531827687, 5.9810879428), (-0.4531827446, 3.3830117314), align=None, mode=Mode.SUBTRACT)
        Polygon((-2.1503604759, 0), (-1.075180238, 1.8622667994), (1.075180238, 1.8622667994), (2.1503604759, 0), (1.075180238, -1.8622667994), (-1.075180238, -1.8622667994), align=None, mode=Mode.SUBTRACT)
        Polygon((0.4531826923, 5.9810879312), (2.7031826802, 7.2801260578), (4.9531826923, 5.981087973), (4.9531827164, 3.3830117616), (2.7031827284, 2.0839736351), (0.4531827164, 3.3830117199), align=None, mode=Mode.SUBTRACT)
        Polygon((3.1563654489, 1.299038115), (5.4063654369, 2.5980762415), (7.6563654489, 1.2990381567), (7.656365473, -1.2990380546), (5.406365485, -2.5980761812), (3.156365473, -1.2990380963), align=None, mode=Mode.SUBTRACT)
    extrude(amount=F1_DEPTH)


solid = f1.part
